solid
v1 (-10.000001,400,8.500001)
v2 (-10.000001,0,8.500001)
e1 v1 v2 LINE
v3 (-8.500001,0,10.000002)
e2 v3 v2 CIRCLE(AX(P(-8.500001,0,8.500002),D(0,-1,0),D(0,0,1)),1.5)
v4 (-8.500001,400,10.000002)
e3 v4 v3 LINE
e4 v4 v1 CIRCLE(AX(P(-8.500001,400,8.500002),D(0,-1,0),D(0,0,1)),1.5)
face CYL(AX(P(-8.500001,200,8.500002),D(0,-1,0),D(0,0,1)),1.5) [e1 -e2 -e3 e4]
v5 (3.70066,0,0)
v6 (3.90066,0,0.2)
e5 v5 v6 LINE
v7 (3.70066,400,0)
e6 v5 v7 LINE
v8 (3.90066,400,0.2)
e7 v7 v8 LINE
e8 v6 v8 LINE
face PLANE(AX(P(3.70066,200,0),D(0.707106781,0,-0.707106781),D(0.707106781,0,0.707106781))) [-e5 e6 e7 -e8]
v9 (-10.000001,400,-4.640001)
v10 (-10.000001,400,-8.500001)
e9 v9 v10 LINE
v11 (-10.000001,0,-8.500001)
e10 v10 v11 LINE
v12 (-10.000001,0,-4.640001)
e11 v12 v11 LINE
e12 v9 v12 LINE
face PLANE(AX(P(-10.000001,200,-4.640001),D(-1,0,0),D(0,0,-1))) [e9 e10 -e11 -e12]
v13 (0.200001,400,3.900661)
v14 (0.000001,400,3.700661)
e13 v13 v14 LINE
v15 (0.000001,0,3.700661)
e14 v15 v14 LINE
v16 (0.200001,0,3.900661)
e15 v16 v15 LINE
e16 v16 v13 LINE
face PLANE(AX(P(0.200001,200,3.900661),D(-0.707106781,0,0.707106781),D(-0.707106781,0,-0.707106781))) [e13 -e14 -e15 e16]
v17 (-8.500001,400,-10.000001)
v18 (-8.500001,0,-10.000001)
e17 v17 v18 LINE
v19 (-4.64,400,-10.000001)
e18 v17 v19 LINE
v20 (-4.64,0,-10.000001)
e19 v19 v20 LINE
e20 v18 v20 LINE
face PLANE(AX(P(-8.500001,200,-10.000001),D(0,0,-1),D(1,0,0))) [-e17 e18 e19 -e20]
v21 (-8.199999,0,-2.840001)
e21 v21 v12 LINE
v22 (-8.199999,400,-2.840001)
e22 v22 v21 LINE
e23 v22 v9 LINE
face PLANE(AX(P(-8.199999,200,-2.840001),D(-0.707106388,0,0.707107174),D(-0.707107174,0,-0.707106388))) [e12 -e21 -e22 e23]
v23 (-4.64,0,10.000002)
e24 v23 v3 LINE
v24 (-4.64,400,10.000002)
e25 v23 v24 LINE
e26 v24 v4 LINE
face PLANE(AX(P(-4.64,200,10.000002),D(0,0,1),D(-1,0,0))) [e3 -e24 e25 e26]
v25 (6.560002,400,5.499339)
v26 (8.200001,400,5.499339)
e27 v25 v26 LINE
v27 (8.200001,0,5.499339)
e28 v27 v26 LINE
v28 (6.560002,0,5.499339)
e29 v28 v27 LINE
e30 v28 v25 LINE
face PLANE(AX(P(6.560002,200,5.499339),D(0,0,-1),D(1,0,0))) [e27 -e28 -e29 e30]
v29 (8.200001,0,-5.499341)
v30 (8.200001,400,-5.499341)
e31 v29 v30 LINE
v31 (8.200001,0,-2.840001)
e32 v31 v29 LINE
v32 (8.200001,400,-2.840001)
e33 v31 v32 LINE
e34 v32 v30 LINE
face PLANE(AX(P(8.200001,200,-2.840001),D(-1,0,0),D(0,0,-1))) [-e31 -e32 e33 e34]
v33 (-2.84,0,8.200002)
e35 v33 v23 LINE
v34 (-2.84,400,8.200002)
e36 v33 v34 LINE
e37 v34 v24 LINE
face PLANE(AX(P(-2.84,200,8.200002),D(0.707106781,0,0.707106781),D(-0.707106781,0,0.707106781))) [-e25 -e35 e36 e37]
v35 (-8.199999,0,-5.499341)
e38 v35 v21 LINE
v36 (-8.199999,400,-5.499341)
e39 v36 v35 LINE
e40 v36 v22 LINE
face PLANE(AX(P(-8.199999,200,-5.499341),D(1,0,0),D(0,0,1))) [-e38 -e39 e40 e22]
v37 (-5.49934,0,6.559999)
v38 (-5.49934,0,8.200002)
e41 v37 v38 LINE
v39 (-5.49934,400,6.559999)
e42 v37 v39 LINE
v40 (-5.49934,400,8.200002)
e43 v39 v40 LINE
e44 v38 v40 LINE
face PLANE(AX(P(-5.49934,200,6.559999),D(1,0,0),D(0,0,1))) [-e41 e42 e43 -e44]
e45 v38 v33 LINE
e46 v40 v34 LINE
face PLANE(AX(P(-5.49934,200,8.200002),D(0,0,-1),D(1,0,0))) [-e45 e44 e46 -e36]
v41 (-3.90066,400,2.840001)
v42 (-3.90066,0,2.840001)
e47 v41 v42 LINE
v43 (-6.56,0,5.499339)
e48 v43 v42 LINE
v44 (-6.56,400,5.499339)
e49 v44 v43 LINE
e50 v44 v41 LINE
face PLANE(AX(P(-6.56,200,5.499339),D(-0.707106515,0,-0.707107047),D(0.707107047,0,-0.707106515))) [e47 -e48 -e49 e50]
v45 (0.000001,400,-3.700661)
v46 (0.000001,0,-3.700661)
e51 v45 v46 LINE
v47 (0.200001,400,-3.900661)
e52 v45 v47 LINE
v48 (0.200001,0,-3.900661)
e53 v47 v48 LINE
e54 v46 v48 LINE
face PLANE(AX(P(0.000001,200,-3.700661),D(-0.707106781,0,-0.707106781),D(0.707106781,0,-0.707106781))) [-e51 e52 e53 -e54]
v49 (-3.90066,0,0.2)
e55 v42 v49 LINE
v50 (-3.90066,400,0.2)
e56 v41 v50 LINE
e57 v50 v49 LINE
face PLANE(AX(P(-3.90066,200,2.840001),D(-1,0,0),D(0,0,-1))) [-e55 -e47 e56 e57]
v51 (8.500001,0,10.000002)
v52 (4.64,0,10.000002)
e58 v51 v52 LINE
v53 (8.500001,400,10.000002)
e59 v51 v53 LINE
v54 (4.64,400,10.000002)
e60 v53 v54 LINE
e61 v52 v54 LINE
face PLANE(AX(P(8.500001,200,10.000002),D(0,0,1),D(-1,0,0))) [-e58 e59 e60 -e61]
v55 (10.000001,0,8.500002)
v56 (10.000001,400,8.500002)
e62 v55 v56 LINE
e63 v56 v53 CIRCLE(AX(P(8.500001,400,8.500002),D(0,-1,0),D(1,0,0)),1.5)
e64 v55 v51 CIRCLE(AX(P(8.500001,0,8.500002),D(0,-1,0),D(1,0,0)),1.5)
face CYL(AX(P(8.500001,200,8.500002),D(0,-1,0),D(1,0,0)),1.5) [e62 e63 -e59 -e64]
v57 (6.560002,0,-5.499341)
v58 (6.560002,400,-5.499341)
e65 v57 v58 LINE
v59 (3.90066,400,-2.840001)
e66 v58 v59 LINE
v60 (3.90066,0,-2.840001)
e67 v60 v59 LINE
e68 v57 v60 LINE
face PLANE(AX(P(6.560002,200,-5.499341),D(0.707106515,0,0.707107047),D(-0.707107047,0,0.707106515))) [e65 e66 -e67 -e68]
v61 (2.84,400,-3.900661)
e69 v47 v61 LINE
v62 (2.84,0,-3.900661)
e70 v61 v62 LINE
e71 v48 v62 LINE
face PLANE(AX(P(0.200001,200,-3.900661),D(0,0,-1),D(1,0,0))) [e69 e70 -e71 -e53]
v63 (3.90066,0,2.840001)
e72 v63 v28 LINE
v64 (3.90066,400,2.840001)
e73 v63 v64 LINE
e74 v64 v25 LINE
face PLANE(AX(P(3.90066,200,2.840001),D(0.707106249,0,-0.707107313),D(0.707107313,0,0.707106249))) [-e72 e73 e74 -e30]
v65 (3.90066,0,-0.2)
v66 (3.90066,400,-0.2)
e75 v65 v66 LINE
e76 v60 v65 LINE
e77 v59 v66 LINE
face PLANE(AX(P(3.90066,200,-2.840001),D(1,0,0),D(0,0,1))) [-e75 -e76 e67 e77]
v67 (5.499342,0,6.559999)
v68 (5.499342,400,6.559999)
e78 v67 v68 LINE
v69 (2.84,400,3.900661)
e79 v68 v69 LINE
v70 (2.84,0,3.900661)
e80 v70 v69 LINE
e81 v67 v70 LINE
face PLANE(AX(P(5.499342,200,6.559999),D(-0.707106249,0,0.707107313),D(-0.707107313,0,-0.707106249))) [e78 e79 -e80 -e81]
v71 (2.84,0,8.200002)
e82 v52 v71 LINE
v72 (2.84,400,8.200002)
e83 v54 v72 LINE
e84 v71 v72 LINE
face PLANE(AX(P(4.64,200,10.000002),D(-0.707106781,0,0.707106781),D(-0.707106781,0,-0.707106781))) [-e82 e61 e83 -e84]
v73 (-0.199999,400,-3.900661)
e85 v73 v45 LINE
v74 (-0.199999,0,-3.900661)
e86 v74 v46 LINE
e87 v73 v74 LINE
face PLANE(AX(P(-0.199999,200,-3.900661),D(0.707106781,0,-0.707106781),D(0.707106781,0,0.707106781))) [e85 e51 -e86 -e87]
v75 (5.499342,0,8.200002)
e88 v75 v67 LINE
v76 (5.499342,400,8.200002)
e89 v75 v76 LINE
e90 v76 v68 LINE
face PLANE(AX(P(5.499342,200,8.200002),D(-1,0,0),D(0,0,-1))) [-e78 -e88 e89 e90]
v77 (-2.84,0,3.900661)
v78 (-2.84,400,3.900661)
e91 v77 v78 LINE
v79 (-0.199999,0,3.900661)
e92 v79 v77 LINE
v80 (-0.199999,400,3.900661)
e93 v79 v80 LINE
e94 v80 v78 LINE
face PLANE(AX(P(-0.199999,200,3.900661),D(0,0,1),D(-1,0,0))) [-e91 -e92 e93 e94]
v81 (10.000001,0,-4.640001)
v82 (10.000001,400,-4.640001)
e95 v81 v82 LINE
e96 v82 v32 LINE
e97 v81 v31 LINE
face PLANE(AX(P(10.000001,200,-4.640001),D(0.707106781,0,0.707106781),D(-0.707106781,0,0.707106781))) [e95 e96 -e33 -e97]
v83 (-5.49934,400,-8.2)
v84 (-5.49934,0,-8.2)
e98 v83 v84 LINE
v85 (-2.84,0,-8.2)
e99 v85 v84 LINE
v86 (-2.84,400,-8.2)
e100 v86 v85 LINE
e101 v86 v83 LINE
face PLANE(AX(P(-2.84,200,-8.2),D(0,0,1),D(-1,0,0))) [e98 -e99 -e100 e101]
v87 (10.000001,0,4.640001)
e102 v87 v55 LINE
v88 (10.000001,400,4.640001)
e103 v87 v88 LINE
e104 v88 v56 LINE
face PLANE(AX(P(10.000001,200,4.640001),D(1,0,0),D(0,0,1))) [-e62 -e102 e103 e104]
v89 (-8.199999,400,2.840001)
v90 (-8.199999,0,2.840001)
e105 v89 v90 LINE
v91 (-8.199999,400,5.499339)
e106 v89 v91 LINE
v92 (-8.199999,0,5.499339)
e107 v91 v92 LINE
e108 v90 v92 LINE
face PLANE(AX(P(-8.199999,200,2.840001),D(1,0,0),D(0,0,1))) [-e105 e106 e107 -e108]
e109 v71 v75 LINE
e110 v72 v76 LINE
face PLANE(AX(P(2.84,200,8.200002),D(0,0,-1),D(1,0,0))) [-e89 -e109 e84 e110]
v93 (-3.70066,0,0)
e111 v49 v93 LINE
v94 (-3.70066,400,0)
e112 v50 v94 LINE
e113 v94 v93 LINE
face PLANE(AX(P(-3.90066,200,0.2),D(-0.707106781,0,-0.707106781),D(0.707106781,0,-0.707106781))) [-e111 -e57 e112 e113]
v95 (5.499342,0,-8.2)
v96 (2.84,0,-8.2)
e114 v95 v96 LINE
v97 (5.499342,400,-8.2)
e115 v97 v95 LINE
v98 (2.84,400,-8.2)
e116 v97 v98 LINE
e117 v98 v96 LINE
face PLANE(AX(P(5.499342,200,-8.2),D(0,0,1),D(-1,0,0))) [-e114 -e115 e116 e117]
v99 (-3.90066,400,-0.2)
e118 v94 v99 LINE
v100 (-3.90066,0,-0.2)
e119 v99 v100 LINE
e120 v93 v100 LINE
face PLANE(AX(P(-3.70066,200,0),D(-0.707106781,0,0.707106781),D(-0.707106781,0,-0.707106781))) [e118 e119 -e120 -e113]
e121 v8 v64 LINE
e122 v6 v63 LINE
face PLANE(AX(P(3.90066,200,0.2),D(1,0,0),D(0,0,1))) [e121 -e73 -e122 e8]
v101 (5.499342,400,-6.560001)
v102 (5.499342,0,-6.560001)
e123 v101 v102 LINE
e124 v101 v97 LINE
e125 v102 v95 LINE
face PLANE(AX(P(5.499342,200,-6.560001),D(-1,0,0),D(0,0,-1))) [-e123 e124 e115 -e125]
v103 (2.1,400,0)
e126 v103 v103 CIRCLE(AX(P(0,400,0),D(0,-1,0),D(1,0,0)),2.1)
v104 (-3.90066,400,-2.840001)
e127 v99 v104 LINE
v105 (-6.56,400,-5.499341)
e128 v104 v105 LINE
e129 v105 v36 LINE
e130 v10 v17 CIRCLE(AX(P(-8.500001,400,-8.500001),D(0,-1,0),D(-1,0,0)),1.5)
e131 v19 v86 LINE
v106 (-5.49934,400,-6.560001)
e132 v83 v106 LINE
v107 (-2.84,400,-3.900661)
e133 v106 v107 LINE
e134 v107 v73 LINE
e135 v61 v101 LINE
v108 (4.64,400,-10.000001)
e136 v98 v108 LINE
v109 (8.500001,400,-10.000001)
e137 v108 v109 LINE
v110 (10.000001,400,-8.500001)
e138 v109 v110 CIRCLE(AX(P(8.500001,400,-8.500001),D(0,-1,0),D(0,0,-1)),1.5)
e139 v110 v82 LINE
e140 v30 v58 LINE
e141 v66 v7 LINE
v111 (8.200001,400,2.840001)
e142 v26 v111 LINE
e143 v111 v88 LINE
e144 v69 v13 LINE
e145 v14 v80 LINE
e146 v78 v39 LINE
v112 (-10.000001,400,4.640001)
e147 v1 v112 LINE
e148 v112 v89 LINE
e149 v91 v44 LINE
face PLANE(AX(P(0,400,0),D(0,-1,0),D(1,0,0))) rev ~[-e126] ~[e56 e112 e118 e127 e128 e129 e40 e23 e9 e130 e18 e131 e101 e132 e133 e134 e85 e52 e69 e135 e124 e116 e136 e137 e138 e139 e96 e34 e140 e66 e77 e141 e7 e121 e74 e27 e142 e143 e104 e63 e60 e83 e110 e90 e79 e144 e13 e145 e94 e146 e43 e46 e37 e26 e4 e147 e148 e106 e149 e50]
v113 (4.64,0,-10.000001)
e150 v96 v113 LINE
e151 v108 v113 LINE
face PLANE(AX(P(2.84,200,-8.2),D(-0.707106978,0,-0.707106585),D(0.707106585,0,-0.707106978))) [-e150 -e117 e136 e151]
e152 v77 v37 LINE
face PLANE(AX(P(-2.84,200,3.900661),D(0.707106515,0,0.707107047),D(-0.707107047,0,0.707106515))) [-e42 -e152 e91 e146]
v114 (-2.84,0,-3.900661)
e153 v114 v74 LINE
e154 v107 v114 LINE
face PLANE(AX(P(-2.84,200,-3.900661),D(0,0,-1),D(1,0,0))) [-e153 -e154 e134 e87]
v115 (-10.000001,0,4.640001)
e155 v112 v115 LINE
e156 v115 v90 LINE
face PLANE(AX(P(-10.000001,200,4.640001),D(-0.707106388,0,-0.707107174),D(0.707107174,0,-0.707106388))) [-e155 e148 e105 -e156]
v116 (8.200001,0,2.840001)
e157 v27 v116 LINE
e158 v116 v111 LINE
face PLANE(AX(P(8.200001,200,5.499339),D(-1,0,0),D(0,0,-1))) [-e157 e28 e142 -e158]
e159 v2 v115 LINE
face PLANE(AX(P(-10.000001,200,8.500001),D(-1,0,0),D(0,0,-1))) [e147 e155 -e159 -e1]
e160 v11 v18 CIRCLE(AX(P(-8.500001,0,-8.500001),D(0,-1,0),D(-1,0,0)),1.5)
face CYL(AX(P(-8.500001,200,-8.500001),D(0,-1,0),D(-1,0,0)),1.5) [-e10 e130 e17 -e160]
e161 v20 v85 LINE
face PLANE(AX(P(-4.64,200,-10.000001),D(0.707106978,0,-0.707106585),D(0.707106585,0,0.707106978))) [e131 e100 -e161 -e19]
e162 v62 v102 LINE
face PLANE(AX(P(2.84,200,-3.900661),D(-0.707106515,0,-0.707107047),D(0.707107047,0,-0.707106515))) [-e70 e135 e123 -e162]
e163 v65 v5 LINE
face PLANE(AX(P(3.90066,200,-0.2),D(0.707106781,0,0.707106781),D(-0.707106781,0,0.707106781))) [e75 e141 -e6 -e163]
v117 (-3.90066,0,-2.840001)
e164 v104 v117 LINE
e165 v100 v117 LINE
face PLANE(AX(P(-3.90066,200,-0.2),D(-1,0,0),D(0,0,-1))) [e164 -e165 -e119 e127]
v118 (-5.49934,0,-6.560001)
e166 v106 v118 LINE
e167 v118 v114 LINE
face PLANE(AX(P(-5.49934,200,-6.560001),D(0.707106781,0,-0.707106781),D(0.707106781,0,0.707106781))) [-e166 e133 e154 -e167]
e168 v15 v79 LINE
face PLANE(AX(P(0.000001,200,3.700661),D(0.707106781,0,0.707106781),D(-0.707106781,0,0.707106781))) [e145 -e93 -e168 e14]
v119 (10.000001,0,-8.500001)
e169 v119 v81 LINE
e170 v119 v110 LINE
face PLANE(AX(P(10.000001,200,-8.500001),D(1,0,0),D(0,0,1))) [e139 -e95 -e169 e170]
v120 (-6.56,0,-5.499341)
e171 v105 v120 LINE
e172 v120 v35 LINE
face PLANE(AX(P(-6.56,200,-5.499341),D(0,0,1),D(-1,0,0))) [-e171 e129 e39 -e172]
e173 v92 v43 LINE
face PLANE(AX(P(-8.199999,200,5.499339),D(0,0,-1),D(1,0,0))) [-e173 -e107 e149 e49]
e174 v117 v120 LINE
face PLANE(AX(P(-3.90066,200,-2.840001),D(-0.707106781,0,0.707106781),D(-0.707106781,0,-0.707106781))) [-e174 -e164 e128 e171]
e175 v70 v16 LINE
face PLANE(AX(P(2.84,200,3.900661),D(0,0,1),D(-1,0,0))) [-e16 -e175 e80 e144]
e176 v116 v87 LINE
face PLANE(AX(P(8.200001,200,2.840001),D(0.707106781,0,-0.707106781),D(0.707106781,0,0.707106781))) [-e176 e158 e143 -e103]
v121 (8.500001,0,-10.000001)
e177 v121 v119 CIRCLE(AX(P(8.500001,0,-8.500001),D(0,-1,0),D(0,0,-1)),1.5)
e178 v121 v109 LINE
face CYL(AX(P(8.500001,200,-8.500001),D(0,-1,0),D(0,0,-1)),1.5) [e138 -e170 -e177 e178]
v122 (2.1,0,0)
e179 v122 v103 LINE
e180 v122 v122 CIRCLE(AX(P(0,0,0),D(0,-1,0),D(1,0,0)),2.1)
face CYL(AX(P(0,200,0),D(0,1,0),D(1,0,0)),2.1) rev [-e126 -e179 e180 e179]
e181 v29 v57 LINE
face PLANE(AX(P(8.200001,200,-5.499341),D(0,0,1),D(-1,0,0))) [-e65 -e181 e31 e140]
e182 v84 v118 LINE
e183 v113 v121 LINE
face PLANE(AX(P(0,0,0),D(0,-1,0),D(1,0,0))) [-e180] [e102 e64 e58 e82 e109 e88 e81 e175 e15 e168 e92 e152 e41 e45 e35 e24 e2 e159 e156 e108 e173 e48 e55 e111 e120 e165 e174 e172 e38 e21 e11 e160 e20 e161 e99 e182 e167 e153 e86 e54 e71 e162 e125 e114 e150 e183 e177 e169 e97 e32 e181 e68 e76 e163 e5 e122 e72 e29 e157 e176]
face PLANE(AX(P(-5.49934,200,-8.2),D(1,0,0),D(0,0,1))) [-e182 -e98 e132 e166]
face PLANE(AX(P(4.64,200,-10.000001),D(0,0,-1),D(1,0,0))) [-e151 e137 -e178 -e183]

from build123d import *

# Parameters (mm, degrees)
F0_R     = 2.1
F1_DEPTH = 200


# Not quite as in the source:
# - ends of sketch curves that miss each other by under 0.0002 mm in the source are joined


with BuildPart() as f1:
    # F0 (on Front) → F1 (new body, symmetric)
    with BuildSketch(Plane.XZ):
        with BuildLine():
            Line((-4.64, 10.000002), (-8.500001, 10.000002))
            ThreePointArc((-8.500001, 10.000002), (-9.5606615253, 9.5606618182), (-10.000001, 8.500001))
            Line((-10.000001, 8.500001), (-10.000001, 4.640001))
            Line((-10.000001, 4.640001), (-8.199999, 2.840001))
            Line((-8.199999, 2.840001), (-8.199999, 5.499339))
            Line((-8.199999, 5.499339), (-6.56, 5.499339))
            Line((-6.56, 5.499339), (-3.90066, 2.840001))
            Line((-3.90066, 2.840001), (-3.90066, 0.2))
            Line((-3.90066, 0.2), (-3.70066, 0))
            Line((-3.70066, 0), (-3.90066, -0.2))
            Line((-3.90066, -0.2), (-3.90066, -2.840001))
            Line((-3.90066, -2.840001), (-6.56, -5.499341))
            Line((-6.56, -5.499341), (-8.199999, -5.499341))
            Line((-8.199999, -5.499341), (-8.199999, -2.840001))
            Line((-8.199999, -2.840001), (-10.000001, -4.640001))
            Line((-10.000001, -4.640001), (-10.000001, -8.500001))
            ThreePointArc((-10.000001, -8.500001), (-9.5606608182, -9.5606615253), (-8.500001, -10.000001))
            Line((-8.500001, -10.000001), (-4.64, -10.000001))
            Line((-4.64, -10.000001), (-2.84, -8.2))
            Line((-2.84, -8.2), (-5.49934, -8.2))
            Line((-5.49934, -8.2), (-5.49934, -6.560001))
            Line((-5.49934, -6.560001), (-2.84, -3.900661))
            Line((-2.84, -3.900661), (-0.199999, -3.900661))
            Line((-0.199999, -3.900661), (1e-06, -3.700661))
            Line((1e-06, -3.700661), (0.200001, -3.900661))
            Line((0.200001, -3.900661), (2.84, -3.900661))
            Line((2.84, -3.900661), (5.499342, -6.560001))
            Line((5.499342, -6.560001), (5.499342, -8.2))
            Line((5.499342, -8.2), (2.84, -8.2))
            Line((2.84, -8.2), (4.64, -10.000001))
            Line((4.64, -10.000001), (8.500001, -10.000001))
            ThreePointArc((8.500001, -10.000001), (9.5606611718, -9.5606611718), (10.000001, -8.500001))
            Line((10.000001, -8.500001), (10.000001, -4.640001))
            Line((10.000001, -4.640001), (8.200001, -2.840001))
            Line((8.200001, -2.840001), (8.200001, -5.499341))
            Line((8.200001, -5.499341), (6.560002, -5.499341))
            Line((6.560002, -5.499341), (3.90066, -2.840001))
            Line((3.90066, -2.840001), (3.90066, -0.2))
            Line((3.90066, -0.2), (3.70066, 0))
            Line((3.70066, 0), (3.90066, 0.2))
            Line((3.90066, 0.2), (3.90066, 2.840001))
            Line((3.90066, 2.840001), (6.560002, 5.499339))
            Line((6.560002, 5.499339), (8.200001, 5.499339))
            Line((8.200001, 5.499339), (8.200001, 2.840001))
            Line((8.200001, 2.840001), (10.000001, 4.640001))
            Line((10.000001, 4.640001), (10.000001, 8.500002))
            ThreePointArc((10.000001, 8.500002), (9.5606611718, 9.5606621718), (8.500001, 10.000002))
            Line((8.500001, 10.000002), (4.64, 10.000002))
            Line((4.64, 10.000002), (2.84, 8.200002))
            Line((2.84, 8.200002), (5.499342, 8.200002))
            Line((5.499342, 8.200002), (5.499342, 6.559999))
            Line((5.499342, 6.559999), (2.84, 3.900661))
            Line((2.84, 3.900661), (0.200001, 3.900661))
            Line((0.200001, 3.900661), (1e-06, 3.700661))
            Line((1e-06, 3.700661), (-0.199999, 3.900661))
            Line((-0.199999, 3.900661), (-2.84, 3.900661))
            Line((-2.84, 3.900661), (-5.49934, 6.559999))
            Line((-5.49934, 6.559999), (-5.49934, 8.200002))
            Line((-5.49934, 8.200002), (-2.84, 8.200002))
            Line((-2.84, 8.200002), (-4.64, 10.000002))
        make_face()
        with Locations((1e-06, 0)):
            Circle(F0_R, mode=Mode.SUBTRACT)
    extrude(amount=F1_DEPTH, both=True)


with BuildPart() as f1_1:
    # F2: moved
    add(f1.part.moved(Location((0, 200, 0))))


solid = f1_1.part
